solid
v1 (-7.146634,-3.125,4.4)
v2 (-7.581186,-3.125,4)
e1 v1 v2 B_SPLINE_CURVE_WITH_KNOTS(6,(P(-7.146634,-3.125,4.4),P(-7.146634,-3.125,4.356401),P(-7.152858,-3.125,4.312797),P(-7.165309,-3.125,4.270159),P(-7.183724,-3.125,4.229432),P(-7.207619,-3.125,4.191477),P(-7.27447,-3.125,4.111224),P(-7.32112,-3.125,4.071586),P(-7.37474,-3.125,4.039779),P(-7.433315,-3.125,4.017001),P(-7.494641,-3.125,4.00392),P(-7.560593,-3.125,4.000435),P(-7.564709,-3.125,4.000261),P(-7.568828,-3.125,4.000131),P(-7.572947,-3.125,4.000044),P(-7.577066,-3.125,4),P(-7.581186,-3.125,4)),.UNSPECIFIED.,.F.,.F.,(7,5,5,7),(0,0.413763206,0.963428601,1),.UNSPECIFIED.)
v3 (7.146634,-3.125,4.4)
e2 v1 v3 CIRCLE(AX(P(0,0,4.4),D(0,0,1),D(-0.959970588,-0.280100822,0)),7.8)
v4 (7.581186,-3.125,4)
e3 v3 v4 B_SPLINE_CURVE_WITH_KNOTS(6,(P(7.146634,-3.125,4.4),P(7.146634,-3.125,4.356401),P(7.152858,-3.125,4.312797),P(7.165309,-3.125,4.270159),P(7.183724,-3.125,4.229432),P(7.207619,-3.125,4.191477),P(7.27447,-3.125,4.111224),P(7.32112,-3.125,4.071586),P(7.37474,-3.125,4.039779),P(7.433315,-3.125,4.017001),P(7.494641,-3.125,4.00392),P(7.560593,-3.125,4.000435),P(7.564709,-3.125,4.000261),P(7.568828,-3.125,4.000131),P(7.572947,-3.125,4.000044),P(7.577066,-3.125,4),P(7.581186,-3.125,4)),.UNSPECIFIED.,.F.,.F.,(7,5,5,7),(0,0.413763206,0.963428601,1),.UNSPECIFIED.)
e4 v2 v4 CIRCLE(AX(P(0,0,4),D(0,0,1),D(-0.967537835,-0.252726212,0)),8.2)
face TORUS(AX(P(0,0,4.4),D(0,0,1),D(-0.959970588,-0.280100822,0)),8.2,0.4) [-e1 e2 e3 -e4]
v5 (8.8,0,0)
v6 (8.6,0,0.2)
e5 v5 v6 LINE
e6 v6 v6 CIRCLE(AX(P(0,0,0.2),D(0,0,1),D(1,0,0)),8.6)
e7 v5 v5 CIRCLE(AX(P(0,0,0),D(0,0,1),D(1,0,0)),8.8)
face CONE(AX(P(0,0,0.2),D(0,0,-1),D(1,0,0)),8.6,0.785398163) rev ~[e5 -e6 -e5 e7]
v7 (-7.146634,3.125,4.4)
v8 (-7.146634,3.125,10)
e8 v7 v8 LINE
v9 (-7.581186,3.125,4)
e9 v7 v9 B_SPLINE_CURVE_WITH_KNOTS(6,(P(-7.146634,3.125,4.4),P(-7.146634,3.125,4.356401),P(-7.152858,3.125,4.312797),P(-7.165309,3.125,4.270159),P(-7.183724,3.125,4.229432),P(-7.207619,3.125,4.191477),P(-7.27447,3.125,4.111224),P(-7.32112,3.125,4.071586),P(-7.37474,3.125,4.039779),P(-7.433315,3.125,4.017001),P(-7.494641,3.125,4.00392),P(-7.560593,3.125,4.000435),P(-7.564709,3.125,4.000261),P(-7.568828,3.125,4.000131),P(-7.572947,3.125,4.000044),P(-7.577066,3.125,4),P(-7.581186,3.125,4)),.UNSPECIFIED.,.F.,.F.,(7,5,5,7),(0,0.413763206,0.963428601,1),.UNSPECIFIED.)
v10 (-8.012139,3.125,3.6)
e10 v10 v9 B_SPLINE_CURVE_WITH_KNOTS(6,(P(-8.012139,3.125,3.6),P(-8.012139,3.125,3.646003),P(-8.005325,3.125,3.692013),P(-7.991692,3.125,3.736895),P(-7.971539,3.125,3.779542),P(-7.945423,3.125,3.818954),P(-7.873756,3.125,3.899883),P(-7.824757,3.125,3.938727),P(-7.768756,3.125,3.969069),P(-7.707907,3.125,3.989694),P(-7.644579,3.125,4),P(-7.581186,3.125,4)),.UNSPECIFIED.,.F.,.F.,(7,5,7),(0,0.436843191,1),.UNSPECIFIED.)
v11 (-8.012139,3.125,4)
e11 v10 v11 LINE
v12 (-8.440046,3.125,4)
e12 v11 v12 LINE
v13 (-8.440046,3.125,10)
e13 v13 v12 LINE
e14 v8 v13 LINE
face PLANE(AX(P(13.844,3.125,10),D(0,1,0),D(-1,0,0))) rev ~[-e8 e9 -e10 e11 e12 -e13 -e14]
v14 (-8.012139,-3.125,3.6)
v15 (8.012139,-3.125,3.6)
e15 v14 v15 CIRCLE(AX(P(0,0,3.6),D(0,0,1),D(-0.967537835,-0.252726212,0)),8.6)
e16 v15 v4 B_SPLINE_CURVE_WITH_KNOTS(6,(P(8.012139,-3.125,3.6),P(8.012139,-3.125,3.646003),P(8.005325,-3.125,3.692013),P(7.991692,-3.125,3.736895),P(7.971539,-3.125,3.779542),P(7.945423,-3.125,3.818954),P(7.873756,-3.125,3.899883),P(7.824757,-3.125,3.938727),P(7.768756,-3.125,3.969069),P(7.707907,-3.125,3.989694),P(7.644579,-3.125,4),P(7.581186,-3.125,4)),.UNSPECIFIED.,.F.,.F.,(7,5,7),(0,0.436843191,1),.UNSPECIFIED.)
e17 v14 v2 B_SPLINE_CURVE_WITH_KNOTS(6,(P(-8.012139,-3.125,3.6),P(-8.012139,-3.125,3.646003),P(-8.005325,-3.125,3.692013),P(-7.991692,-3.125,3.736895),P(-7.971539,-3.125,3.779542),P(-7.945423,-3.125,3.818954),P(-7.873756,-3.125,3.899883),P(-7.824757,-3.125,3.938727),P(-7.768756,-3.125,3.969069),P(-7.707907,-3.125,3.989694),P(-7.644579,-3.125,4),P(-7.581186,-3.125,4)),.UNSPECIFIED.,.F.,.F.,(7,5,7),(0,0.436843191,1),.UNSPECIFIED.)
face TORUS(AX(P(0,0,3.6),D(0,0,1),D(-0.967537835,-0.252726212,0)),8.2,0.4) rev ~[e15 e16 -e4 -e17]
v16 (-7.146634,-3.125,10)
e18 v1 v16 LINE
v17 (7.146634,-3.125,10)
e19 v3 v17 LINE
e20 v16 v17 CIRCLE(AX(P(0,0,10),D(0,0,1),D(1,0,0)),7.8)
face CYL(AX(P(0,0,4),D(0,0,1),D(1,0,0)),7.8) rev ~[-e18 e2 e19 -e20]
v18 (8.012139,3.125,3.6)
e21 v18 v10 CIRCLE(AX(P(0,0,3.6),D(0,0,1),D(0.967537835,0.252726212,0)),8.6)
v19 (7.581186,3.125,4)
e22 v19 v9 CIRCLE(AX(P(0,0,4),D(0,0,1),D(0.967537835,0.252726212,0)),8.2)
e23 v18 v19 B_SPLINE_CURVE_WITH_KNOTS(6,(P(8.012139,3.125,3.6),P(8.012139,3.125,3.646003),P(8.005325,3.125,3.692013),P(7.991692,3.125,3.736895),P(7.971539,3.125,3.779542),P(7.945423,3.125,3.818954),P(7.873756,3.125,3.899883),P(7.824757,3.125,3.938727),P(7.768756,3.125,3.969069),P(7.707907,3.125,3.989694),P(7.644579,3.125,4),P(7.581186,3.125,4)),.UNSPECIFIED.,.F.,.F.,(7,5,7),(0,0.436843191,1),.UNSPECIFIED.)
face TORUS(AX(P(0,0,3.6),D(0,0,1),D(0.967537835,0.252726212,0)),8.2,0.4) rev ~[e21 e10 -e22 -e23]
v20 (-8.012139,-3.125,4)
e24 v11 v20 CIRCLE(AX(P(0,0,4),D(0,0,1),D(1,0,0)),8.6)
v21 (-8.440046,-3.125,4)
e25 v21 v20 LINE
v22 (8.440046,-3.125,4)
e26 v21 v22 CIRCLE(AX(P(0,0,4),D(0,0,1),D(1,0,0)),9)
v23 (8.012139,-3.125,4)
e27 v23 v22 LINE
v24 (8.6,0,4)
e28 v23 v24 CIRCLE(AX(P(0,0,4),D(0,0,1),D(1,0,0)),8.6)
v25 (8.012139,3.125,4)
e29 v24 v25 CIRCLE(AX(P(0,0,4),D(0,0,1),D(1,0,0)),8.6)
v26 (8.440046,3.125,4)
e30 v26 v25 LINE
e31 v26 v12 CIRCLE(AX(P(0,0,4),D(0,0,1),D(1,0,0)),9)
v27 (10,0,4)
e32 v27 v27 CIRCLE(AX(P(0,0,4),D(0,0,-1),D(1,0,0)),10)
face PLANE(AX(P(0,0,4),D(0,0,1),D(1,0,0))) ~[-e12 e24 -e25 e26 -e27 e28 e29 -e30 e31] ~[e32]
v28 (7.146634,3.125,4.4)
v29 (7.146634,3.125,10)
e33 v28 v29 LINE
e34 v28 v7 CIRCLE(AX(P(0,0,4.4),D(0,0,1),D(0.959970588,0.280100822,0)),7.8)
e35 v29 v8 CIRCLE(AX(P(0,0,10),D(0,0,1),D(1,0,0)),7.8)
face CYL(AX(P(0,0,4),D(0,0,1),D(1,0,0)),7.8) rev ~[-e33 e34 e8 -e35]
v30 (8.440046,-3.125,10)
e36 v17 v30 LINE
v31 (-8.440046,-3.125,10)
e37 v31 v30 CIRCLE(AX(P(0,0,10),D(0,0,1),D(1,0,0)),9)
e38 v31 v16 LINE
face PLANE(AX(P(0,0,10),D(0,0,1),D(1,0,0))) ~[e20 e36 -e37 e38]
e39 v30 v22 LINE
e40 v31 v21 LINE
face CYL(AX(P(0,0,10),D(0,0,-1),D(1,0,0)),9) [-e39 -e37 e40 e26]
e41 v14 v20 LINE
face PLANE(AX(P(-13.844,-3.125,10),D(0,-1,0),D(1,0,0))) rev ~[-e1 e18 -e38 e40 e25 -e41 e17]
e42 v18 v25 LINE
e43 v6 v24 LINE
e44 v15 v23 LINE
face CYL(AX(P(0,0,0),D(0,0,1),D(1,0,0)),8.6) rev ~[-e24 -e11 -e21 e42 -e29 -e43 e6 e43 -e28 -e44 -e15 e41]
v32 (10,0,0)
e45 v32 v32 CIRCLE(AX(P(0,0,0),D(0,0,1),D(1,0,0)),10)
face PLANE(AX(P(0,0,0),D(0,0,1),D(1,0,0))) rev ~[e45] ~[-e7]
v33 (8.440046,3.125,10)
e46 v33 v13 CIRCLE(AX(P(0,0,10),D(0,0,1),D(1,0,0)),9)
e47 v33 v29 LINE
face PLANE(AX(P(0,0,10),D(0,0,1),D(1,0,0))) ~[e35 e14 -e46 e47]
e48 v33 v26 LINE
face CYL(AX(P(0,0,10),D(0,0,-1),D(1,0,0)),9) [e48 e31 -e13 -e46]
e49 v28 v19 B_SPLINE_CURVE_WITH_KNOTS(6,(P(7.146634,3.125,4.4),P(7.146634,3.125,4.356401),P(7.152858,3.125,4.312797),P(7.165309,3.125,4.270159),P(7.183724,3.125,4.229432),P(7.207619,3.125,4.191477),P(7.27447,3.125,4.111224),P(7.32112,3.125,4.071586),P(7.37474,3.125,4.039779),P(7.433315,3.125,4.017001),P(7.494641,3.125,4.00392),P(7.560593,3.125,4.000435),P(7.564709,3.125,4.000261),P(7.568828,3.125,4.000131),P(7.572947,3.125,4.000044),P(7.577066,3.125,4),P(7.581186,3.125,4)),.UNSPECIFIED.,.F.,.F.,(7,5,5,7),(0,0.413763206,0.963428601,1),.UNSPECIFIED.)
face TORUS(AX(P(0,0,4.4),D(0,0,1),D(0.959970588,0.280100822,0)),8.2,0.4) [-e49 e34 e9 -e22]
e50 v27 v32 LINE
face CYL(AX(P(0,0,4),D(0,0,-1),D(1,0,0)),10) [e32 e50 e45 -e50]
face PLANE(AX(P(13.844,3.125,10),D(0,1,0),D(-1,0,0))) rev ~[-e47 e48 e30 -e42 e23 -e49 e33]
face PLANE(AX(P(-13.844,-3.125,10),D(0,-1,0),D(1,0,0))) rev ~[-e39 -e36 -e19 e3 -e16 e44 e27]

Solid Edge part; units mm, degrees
sketch "Sketch1" plane through (0, 0, 0) normal (0, -1, 0) x (1, 0, 0)
  line L0 (10, 4) -> (10, 0)
  line L1 (10, 0) -> (8.6, 0)
  line L2 (8.6, 0) -> (8.6, 4)
  line L3 (8.6, 4) -> (7.8, 4)
  line L4 (7.8, 4) -> (7.8, 10)
  line L5 (7.8, 10) -> (9, 10)
  line L6 (9, 10) -> (9, 4)
  line L7 (9, 4) -> (10, 4)
revolve "RevolvedProtrusion1" add sketch "Sketch1" angle 360 about axis through (0, 0, 0) along (0, 0, 1)
sketch "Sketch2" plane through (0, 0, 10) normal (0, 0, 1) x (1, 0, 0)
  line L0 (-13.844, -3.125) -> (13.844, -3.125)
  line L1 (13.844, -3.125) -> (13.844, 3.125)
  line L2 (13.844, 3.125) -> (-13.844, 3.125)
  line L3 (-13.844, 3.125) -> (-13.844, -3.125)
extrude "Cutout1" cut sketch "Sketch2" against normal up to surface (6 mm away)
fillet "Round1" radius 0.4 4 edges at (0, 8.6, 4) (0, -8.6, 4) (0, -7.8, 4) (0, 7.8, 4)
chamfer "Chaflán_1" distance 0.2 angle 45 1 edges at (-8.6, 0, 0)
